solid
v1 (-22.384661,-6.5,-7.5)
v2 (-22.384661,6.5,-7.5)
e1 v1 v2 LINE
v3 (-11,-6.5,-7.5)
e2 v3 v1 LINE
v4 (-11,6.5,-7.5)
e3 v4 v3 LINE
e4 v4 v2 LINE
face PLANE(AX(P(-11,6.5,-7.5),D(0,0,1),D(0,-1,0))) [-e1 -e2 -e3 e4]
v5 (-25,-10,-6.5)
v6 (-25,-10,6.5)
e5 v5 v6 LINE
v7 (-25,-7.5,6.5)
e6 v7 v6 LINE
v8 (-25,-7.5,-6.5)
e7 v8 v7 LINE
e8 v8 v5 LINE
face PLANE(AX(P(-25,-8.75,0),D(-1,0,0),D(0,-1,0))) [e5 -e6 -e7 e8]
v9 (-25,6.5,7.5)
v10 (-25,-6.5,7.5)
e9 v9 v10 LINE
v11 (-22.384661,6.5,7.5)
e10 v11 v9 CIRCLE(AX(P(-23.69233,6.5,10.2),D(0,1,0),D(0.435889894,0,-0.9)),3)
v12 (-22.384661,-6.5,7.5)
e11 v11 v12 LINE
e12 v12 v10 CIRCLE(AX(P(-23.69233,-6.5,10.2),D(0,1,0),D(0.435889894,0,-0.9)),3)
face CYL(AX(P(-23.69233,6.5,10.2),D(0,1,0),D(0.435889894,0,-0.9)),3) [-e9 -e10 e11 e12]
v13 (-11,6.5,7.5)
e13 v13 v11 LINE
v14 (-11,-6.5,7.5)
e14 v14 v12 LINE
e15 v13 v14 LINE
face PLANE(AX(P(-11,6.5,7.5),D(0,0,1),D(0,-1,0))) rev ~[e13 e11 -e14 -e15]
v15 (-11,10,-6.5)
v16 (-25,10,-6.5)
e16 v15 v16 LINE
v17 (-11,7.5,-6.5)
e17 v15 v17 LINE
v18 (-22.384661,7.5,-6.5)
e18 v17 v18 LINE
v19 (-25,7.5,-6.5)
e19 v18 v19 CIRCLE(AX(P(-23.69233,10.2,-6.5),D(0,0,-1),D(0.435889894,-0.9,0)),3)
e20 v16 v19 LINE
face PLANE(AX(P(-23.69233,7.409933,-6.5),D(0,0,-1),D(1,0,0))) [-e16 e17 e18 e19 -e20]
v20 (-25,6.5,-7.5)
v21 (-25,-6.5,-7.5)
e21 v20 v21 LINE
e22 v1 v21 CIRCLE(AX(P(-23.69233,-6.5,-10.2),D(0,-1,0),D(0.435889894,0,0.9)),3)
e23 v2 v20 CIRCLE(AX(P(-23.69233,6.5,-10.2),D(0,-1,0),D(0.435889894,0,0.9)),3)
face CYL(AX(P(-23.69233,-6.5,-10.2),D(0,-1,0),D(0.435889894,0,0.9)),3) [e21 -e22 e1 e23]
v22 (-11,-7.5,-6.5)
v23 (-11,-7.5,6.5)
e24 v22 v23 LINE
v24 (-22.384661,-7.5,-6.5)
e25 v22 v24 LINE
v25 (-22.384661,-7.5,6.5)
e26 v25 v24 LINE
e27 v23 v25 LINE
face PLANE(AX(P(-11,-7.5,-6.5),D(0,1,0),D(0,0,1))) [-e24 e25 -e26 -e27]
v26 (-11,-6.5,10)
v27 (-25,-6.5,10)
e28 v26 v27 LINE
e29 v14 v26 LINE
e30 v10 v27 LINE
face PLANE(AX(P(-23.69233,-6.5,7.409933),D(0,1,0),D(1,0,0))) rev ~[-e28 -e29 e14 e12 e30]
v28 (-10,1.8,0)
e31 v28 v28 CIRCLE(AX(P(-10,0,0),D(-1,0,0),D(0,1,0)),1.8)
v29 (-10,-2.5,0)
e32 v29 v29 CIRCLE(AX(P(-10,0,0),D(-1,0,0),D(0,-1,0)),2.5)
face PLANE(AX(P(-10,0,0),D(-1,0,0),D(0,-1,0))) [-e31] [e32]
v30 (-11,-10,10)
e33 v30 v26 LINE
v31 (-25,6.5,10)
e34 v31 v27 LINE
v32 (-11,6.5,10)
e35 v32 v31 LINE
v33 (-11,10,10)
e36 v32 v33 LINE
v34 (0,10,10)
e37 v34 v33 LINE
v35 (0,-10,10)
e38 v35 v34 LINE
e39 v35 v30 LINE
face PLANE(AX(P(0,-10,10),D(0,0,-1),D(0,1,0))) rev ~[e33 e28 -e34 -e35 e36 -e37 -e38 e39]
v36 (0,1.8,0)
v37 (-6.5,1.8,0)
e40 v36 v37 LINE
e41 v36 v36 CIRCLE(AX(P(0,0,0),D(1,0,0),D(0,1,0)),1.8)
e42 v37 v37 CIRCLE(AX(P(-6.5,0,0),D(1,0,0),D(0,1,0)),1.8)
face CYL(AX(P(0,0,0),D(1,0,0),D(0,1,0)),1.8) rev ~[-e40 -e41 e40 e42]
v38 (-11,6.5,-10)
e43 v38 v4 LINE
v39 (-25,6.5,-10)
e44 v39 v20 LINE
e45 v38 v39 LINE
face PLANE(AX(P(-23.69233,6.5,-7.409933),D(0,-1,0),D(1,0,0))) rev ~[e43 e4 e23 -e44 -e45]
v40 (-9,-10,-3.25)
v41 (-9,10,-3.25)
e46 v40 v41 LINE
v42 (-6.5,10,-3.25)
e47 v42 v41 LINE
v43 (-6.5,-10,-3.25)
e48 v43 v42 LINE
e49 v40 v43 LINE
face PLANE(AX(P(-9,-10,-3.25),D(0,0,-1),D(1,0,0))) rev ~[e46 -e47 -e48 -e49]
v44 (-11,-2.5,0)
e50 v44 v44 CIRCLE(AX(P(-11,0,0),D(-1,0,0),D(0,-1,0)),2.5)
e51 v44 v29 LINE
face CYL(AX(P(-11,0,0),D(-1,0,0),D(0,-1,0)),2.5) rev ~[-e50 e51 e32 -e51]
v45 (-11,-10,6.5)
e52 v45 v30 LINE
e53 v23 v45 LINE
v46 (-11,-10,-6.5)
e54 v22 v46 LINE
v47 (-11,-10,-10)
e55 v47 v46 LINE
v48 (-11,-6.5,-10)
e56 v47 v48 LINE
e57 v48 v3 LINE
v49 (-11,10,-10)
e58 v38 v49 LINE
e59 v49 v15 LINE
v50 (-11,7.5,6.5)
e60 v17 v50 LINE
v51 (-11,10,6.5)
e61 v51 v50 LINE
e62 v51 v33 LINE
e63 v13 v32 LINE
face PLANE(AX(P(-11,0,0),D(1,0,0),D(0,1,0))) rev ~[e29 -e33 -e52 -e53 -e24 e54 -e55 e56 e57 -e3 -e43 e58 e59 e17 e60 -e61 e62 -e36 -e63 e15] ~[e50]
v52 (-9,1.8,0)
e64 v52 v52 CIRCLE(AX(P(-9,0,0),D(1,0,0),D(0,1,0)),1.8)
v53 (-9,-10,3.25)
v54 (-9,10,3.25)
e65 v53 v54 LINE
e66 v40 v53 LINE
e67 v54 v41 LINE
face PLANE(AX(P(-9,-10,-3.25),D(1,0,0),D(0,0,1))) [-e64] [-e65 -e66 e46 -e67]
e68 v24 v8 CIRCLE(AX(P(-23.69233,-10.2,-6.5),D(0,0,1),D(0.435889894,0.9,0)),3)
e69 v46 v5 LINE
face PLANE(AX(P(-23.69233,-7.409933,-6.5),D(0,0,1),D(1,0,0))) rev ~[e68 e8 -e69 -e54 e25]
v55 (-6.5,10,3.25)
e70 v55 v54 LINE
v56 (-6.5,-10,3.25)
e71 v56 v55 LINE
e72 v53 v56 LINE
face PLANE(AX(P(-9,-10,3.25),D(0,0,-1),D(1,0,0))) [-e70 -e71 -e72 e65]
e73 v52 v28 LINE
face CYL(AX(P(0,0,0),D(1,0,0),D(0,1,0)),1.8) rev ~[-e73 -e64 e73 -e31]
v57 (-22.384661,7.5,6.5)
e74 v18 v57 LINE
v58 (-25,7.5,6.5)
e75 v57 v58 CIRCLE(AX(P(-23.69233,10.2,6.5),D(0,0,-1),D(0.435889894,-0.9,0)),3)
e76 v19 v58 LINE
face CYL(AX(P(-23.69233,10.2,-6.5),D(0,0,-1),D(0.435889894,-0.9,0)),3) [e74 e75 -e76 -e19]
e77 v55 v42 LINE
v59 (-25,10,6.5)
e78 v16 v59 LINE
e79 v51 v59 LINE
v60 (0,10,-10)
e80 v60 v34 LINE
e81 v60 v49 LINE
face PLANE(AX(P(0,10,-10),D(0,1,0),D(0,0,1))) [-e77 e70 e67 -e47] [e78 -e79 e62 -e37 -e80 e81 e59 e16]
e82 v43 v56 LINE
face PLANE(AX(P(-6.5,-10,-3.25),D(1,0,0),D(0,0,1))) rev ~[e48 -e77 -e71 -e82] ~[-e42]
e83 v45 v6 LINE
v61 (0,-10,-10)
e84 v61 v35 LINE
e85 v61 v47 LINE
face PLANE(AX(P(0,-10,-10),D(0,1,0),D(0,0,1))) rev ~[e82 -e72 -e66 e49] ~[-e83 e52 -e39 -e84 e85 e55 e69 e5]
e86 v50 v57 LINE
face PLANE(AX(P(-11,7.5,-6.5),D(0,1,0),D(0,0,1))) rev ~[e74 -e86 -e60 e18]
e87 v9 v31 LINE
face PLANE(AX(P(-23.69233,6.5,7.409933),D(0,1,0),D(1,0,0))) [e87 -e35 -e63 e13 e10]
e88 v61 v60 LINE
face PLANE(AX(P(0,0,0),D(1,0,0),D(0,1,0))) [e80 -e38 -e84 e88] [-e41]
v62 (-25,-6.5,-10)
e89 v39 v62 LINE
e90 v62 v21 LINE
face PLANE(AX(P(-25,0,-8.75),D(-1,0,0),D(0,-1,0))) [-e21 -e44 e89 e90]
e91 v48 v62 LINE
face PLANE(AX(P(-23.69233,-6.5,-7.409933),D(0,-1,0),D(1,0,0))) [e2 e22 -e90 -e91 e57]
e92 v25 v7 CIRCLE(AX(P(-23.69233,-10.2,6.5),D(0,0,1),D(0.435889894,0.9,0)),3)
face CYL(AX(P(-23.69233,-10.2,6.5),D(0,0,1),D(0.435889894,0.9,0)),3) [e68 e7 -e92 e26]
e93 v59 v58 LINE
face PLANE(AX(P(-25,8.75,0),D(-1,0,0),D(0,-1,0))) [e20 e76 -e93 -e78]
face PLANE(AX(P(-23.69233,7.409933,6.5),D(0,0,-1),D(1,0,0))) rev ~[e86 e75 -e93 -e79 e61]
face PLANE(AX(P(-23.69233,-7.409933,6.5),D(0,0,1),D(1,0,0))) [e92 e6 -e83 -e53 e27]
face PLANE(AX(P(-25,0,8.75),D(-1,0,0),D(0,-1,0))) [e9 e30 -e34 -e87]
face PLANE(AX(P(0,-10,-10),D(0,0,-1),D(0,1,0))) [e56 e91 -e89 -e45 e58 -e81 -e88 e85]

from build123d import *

# Parameters (mm, degrees)
F0_W            = 20
F0_H            = 20
F0_R            = 1.8
F1_DEPTH        = 11
F2_W            = 13
F2_H            = 2.5
F2_W_2          = 2.5
F2_H_2          = 13
F3_DEPTH        = 14
F2_R            = 2.5
F2_R_2          = 1.8
F4_DEPTH        = 1
F5_W            = 2.5
F5_H            = 6.5
F6_DEPTH        = 25
F8_DEPTH        = 13
F8_COPIES_COUNT = 4


# Not quite as in the source:
# - a pattern or mirror of a feature is missing from the dataset's text; its kind, count and spacing are read off the source's solid


with BuildPart() as f1:
    # F0 (on Right) → F1 (new body)
    with BuildSketch(Plane.YZ):
        Rectangle(F0_W, F0_H)
        Circle(F0_R, mode=Mode.SUBTRACT)
    extrude(amount=-F1_DEPTH)

    # F2 (on face) → F3 (join)
    with BuildSketch(Plane(origin=(-11, 0, 0), x_dir=(0, -1, 0), z_dir=(-1, 0, 0))):
        with Locations((0, -8.75)):
            Rectangle(F2_W, F2_H)
        with Locations((8.75, 0)):
            Rectangle(F2_W_2, F2_H_2)
        with Locations((-8.75, 0)):
            Rectangle(F2_W_2, F2_H_2)
        with Locations((0, 8.75)):
            Rectangle(F2_W, F2_H)
    extrude(amount=F3_DEPTH)

    # F2 (on face) → F4 (cut)
    with BuildSketch(Plane(origin=(-11, 0, 0), x_dir=(0, -1, 0), z_dir=(-1, 0, 0))):
        Circle(F2_R)
        Circle(F2_R_2, mode=Mode.SUBTRACT)
    extrude(amount=-F4_DEPTH, mode=Mode.SUBTRACT)

    # F5 (on face) → F6 (cut)
    with BuildSketch(Plane.XZ.offset(10)):
        with Locations((-7.75, 0)):
            Rectangle(F5_W, F5_H)
    extrude(amount=-F6_DEPTH, mode=Mode.SUBTRACT)

    # F7 (on face) → F8 (join, through all)
    with BuildSketch(Plane.XZ.offset(6.5)):
        with BuildLine():
            Line((-25, -7.5), (-22.3846606339, -7.5))
            ThreePointArc((-22.3846606339, -7.5), (-23.6923303169, -7.2), (-25, -7.5))
        make_face()
    f8 = extrude(amount=-F8_DEPTH)

    # F8_copies: F8 ×4 about axis
    f8_copies_axis = Axis((0, 0, 0), (1, 0, 0))
    for i in range(1, F8_COPIES_COUNT):
        add(f8.rotate(f8_copies_axis, i * 360 / F8_COPIES_COUNT))


solid = f1.part
